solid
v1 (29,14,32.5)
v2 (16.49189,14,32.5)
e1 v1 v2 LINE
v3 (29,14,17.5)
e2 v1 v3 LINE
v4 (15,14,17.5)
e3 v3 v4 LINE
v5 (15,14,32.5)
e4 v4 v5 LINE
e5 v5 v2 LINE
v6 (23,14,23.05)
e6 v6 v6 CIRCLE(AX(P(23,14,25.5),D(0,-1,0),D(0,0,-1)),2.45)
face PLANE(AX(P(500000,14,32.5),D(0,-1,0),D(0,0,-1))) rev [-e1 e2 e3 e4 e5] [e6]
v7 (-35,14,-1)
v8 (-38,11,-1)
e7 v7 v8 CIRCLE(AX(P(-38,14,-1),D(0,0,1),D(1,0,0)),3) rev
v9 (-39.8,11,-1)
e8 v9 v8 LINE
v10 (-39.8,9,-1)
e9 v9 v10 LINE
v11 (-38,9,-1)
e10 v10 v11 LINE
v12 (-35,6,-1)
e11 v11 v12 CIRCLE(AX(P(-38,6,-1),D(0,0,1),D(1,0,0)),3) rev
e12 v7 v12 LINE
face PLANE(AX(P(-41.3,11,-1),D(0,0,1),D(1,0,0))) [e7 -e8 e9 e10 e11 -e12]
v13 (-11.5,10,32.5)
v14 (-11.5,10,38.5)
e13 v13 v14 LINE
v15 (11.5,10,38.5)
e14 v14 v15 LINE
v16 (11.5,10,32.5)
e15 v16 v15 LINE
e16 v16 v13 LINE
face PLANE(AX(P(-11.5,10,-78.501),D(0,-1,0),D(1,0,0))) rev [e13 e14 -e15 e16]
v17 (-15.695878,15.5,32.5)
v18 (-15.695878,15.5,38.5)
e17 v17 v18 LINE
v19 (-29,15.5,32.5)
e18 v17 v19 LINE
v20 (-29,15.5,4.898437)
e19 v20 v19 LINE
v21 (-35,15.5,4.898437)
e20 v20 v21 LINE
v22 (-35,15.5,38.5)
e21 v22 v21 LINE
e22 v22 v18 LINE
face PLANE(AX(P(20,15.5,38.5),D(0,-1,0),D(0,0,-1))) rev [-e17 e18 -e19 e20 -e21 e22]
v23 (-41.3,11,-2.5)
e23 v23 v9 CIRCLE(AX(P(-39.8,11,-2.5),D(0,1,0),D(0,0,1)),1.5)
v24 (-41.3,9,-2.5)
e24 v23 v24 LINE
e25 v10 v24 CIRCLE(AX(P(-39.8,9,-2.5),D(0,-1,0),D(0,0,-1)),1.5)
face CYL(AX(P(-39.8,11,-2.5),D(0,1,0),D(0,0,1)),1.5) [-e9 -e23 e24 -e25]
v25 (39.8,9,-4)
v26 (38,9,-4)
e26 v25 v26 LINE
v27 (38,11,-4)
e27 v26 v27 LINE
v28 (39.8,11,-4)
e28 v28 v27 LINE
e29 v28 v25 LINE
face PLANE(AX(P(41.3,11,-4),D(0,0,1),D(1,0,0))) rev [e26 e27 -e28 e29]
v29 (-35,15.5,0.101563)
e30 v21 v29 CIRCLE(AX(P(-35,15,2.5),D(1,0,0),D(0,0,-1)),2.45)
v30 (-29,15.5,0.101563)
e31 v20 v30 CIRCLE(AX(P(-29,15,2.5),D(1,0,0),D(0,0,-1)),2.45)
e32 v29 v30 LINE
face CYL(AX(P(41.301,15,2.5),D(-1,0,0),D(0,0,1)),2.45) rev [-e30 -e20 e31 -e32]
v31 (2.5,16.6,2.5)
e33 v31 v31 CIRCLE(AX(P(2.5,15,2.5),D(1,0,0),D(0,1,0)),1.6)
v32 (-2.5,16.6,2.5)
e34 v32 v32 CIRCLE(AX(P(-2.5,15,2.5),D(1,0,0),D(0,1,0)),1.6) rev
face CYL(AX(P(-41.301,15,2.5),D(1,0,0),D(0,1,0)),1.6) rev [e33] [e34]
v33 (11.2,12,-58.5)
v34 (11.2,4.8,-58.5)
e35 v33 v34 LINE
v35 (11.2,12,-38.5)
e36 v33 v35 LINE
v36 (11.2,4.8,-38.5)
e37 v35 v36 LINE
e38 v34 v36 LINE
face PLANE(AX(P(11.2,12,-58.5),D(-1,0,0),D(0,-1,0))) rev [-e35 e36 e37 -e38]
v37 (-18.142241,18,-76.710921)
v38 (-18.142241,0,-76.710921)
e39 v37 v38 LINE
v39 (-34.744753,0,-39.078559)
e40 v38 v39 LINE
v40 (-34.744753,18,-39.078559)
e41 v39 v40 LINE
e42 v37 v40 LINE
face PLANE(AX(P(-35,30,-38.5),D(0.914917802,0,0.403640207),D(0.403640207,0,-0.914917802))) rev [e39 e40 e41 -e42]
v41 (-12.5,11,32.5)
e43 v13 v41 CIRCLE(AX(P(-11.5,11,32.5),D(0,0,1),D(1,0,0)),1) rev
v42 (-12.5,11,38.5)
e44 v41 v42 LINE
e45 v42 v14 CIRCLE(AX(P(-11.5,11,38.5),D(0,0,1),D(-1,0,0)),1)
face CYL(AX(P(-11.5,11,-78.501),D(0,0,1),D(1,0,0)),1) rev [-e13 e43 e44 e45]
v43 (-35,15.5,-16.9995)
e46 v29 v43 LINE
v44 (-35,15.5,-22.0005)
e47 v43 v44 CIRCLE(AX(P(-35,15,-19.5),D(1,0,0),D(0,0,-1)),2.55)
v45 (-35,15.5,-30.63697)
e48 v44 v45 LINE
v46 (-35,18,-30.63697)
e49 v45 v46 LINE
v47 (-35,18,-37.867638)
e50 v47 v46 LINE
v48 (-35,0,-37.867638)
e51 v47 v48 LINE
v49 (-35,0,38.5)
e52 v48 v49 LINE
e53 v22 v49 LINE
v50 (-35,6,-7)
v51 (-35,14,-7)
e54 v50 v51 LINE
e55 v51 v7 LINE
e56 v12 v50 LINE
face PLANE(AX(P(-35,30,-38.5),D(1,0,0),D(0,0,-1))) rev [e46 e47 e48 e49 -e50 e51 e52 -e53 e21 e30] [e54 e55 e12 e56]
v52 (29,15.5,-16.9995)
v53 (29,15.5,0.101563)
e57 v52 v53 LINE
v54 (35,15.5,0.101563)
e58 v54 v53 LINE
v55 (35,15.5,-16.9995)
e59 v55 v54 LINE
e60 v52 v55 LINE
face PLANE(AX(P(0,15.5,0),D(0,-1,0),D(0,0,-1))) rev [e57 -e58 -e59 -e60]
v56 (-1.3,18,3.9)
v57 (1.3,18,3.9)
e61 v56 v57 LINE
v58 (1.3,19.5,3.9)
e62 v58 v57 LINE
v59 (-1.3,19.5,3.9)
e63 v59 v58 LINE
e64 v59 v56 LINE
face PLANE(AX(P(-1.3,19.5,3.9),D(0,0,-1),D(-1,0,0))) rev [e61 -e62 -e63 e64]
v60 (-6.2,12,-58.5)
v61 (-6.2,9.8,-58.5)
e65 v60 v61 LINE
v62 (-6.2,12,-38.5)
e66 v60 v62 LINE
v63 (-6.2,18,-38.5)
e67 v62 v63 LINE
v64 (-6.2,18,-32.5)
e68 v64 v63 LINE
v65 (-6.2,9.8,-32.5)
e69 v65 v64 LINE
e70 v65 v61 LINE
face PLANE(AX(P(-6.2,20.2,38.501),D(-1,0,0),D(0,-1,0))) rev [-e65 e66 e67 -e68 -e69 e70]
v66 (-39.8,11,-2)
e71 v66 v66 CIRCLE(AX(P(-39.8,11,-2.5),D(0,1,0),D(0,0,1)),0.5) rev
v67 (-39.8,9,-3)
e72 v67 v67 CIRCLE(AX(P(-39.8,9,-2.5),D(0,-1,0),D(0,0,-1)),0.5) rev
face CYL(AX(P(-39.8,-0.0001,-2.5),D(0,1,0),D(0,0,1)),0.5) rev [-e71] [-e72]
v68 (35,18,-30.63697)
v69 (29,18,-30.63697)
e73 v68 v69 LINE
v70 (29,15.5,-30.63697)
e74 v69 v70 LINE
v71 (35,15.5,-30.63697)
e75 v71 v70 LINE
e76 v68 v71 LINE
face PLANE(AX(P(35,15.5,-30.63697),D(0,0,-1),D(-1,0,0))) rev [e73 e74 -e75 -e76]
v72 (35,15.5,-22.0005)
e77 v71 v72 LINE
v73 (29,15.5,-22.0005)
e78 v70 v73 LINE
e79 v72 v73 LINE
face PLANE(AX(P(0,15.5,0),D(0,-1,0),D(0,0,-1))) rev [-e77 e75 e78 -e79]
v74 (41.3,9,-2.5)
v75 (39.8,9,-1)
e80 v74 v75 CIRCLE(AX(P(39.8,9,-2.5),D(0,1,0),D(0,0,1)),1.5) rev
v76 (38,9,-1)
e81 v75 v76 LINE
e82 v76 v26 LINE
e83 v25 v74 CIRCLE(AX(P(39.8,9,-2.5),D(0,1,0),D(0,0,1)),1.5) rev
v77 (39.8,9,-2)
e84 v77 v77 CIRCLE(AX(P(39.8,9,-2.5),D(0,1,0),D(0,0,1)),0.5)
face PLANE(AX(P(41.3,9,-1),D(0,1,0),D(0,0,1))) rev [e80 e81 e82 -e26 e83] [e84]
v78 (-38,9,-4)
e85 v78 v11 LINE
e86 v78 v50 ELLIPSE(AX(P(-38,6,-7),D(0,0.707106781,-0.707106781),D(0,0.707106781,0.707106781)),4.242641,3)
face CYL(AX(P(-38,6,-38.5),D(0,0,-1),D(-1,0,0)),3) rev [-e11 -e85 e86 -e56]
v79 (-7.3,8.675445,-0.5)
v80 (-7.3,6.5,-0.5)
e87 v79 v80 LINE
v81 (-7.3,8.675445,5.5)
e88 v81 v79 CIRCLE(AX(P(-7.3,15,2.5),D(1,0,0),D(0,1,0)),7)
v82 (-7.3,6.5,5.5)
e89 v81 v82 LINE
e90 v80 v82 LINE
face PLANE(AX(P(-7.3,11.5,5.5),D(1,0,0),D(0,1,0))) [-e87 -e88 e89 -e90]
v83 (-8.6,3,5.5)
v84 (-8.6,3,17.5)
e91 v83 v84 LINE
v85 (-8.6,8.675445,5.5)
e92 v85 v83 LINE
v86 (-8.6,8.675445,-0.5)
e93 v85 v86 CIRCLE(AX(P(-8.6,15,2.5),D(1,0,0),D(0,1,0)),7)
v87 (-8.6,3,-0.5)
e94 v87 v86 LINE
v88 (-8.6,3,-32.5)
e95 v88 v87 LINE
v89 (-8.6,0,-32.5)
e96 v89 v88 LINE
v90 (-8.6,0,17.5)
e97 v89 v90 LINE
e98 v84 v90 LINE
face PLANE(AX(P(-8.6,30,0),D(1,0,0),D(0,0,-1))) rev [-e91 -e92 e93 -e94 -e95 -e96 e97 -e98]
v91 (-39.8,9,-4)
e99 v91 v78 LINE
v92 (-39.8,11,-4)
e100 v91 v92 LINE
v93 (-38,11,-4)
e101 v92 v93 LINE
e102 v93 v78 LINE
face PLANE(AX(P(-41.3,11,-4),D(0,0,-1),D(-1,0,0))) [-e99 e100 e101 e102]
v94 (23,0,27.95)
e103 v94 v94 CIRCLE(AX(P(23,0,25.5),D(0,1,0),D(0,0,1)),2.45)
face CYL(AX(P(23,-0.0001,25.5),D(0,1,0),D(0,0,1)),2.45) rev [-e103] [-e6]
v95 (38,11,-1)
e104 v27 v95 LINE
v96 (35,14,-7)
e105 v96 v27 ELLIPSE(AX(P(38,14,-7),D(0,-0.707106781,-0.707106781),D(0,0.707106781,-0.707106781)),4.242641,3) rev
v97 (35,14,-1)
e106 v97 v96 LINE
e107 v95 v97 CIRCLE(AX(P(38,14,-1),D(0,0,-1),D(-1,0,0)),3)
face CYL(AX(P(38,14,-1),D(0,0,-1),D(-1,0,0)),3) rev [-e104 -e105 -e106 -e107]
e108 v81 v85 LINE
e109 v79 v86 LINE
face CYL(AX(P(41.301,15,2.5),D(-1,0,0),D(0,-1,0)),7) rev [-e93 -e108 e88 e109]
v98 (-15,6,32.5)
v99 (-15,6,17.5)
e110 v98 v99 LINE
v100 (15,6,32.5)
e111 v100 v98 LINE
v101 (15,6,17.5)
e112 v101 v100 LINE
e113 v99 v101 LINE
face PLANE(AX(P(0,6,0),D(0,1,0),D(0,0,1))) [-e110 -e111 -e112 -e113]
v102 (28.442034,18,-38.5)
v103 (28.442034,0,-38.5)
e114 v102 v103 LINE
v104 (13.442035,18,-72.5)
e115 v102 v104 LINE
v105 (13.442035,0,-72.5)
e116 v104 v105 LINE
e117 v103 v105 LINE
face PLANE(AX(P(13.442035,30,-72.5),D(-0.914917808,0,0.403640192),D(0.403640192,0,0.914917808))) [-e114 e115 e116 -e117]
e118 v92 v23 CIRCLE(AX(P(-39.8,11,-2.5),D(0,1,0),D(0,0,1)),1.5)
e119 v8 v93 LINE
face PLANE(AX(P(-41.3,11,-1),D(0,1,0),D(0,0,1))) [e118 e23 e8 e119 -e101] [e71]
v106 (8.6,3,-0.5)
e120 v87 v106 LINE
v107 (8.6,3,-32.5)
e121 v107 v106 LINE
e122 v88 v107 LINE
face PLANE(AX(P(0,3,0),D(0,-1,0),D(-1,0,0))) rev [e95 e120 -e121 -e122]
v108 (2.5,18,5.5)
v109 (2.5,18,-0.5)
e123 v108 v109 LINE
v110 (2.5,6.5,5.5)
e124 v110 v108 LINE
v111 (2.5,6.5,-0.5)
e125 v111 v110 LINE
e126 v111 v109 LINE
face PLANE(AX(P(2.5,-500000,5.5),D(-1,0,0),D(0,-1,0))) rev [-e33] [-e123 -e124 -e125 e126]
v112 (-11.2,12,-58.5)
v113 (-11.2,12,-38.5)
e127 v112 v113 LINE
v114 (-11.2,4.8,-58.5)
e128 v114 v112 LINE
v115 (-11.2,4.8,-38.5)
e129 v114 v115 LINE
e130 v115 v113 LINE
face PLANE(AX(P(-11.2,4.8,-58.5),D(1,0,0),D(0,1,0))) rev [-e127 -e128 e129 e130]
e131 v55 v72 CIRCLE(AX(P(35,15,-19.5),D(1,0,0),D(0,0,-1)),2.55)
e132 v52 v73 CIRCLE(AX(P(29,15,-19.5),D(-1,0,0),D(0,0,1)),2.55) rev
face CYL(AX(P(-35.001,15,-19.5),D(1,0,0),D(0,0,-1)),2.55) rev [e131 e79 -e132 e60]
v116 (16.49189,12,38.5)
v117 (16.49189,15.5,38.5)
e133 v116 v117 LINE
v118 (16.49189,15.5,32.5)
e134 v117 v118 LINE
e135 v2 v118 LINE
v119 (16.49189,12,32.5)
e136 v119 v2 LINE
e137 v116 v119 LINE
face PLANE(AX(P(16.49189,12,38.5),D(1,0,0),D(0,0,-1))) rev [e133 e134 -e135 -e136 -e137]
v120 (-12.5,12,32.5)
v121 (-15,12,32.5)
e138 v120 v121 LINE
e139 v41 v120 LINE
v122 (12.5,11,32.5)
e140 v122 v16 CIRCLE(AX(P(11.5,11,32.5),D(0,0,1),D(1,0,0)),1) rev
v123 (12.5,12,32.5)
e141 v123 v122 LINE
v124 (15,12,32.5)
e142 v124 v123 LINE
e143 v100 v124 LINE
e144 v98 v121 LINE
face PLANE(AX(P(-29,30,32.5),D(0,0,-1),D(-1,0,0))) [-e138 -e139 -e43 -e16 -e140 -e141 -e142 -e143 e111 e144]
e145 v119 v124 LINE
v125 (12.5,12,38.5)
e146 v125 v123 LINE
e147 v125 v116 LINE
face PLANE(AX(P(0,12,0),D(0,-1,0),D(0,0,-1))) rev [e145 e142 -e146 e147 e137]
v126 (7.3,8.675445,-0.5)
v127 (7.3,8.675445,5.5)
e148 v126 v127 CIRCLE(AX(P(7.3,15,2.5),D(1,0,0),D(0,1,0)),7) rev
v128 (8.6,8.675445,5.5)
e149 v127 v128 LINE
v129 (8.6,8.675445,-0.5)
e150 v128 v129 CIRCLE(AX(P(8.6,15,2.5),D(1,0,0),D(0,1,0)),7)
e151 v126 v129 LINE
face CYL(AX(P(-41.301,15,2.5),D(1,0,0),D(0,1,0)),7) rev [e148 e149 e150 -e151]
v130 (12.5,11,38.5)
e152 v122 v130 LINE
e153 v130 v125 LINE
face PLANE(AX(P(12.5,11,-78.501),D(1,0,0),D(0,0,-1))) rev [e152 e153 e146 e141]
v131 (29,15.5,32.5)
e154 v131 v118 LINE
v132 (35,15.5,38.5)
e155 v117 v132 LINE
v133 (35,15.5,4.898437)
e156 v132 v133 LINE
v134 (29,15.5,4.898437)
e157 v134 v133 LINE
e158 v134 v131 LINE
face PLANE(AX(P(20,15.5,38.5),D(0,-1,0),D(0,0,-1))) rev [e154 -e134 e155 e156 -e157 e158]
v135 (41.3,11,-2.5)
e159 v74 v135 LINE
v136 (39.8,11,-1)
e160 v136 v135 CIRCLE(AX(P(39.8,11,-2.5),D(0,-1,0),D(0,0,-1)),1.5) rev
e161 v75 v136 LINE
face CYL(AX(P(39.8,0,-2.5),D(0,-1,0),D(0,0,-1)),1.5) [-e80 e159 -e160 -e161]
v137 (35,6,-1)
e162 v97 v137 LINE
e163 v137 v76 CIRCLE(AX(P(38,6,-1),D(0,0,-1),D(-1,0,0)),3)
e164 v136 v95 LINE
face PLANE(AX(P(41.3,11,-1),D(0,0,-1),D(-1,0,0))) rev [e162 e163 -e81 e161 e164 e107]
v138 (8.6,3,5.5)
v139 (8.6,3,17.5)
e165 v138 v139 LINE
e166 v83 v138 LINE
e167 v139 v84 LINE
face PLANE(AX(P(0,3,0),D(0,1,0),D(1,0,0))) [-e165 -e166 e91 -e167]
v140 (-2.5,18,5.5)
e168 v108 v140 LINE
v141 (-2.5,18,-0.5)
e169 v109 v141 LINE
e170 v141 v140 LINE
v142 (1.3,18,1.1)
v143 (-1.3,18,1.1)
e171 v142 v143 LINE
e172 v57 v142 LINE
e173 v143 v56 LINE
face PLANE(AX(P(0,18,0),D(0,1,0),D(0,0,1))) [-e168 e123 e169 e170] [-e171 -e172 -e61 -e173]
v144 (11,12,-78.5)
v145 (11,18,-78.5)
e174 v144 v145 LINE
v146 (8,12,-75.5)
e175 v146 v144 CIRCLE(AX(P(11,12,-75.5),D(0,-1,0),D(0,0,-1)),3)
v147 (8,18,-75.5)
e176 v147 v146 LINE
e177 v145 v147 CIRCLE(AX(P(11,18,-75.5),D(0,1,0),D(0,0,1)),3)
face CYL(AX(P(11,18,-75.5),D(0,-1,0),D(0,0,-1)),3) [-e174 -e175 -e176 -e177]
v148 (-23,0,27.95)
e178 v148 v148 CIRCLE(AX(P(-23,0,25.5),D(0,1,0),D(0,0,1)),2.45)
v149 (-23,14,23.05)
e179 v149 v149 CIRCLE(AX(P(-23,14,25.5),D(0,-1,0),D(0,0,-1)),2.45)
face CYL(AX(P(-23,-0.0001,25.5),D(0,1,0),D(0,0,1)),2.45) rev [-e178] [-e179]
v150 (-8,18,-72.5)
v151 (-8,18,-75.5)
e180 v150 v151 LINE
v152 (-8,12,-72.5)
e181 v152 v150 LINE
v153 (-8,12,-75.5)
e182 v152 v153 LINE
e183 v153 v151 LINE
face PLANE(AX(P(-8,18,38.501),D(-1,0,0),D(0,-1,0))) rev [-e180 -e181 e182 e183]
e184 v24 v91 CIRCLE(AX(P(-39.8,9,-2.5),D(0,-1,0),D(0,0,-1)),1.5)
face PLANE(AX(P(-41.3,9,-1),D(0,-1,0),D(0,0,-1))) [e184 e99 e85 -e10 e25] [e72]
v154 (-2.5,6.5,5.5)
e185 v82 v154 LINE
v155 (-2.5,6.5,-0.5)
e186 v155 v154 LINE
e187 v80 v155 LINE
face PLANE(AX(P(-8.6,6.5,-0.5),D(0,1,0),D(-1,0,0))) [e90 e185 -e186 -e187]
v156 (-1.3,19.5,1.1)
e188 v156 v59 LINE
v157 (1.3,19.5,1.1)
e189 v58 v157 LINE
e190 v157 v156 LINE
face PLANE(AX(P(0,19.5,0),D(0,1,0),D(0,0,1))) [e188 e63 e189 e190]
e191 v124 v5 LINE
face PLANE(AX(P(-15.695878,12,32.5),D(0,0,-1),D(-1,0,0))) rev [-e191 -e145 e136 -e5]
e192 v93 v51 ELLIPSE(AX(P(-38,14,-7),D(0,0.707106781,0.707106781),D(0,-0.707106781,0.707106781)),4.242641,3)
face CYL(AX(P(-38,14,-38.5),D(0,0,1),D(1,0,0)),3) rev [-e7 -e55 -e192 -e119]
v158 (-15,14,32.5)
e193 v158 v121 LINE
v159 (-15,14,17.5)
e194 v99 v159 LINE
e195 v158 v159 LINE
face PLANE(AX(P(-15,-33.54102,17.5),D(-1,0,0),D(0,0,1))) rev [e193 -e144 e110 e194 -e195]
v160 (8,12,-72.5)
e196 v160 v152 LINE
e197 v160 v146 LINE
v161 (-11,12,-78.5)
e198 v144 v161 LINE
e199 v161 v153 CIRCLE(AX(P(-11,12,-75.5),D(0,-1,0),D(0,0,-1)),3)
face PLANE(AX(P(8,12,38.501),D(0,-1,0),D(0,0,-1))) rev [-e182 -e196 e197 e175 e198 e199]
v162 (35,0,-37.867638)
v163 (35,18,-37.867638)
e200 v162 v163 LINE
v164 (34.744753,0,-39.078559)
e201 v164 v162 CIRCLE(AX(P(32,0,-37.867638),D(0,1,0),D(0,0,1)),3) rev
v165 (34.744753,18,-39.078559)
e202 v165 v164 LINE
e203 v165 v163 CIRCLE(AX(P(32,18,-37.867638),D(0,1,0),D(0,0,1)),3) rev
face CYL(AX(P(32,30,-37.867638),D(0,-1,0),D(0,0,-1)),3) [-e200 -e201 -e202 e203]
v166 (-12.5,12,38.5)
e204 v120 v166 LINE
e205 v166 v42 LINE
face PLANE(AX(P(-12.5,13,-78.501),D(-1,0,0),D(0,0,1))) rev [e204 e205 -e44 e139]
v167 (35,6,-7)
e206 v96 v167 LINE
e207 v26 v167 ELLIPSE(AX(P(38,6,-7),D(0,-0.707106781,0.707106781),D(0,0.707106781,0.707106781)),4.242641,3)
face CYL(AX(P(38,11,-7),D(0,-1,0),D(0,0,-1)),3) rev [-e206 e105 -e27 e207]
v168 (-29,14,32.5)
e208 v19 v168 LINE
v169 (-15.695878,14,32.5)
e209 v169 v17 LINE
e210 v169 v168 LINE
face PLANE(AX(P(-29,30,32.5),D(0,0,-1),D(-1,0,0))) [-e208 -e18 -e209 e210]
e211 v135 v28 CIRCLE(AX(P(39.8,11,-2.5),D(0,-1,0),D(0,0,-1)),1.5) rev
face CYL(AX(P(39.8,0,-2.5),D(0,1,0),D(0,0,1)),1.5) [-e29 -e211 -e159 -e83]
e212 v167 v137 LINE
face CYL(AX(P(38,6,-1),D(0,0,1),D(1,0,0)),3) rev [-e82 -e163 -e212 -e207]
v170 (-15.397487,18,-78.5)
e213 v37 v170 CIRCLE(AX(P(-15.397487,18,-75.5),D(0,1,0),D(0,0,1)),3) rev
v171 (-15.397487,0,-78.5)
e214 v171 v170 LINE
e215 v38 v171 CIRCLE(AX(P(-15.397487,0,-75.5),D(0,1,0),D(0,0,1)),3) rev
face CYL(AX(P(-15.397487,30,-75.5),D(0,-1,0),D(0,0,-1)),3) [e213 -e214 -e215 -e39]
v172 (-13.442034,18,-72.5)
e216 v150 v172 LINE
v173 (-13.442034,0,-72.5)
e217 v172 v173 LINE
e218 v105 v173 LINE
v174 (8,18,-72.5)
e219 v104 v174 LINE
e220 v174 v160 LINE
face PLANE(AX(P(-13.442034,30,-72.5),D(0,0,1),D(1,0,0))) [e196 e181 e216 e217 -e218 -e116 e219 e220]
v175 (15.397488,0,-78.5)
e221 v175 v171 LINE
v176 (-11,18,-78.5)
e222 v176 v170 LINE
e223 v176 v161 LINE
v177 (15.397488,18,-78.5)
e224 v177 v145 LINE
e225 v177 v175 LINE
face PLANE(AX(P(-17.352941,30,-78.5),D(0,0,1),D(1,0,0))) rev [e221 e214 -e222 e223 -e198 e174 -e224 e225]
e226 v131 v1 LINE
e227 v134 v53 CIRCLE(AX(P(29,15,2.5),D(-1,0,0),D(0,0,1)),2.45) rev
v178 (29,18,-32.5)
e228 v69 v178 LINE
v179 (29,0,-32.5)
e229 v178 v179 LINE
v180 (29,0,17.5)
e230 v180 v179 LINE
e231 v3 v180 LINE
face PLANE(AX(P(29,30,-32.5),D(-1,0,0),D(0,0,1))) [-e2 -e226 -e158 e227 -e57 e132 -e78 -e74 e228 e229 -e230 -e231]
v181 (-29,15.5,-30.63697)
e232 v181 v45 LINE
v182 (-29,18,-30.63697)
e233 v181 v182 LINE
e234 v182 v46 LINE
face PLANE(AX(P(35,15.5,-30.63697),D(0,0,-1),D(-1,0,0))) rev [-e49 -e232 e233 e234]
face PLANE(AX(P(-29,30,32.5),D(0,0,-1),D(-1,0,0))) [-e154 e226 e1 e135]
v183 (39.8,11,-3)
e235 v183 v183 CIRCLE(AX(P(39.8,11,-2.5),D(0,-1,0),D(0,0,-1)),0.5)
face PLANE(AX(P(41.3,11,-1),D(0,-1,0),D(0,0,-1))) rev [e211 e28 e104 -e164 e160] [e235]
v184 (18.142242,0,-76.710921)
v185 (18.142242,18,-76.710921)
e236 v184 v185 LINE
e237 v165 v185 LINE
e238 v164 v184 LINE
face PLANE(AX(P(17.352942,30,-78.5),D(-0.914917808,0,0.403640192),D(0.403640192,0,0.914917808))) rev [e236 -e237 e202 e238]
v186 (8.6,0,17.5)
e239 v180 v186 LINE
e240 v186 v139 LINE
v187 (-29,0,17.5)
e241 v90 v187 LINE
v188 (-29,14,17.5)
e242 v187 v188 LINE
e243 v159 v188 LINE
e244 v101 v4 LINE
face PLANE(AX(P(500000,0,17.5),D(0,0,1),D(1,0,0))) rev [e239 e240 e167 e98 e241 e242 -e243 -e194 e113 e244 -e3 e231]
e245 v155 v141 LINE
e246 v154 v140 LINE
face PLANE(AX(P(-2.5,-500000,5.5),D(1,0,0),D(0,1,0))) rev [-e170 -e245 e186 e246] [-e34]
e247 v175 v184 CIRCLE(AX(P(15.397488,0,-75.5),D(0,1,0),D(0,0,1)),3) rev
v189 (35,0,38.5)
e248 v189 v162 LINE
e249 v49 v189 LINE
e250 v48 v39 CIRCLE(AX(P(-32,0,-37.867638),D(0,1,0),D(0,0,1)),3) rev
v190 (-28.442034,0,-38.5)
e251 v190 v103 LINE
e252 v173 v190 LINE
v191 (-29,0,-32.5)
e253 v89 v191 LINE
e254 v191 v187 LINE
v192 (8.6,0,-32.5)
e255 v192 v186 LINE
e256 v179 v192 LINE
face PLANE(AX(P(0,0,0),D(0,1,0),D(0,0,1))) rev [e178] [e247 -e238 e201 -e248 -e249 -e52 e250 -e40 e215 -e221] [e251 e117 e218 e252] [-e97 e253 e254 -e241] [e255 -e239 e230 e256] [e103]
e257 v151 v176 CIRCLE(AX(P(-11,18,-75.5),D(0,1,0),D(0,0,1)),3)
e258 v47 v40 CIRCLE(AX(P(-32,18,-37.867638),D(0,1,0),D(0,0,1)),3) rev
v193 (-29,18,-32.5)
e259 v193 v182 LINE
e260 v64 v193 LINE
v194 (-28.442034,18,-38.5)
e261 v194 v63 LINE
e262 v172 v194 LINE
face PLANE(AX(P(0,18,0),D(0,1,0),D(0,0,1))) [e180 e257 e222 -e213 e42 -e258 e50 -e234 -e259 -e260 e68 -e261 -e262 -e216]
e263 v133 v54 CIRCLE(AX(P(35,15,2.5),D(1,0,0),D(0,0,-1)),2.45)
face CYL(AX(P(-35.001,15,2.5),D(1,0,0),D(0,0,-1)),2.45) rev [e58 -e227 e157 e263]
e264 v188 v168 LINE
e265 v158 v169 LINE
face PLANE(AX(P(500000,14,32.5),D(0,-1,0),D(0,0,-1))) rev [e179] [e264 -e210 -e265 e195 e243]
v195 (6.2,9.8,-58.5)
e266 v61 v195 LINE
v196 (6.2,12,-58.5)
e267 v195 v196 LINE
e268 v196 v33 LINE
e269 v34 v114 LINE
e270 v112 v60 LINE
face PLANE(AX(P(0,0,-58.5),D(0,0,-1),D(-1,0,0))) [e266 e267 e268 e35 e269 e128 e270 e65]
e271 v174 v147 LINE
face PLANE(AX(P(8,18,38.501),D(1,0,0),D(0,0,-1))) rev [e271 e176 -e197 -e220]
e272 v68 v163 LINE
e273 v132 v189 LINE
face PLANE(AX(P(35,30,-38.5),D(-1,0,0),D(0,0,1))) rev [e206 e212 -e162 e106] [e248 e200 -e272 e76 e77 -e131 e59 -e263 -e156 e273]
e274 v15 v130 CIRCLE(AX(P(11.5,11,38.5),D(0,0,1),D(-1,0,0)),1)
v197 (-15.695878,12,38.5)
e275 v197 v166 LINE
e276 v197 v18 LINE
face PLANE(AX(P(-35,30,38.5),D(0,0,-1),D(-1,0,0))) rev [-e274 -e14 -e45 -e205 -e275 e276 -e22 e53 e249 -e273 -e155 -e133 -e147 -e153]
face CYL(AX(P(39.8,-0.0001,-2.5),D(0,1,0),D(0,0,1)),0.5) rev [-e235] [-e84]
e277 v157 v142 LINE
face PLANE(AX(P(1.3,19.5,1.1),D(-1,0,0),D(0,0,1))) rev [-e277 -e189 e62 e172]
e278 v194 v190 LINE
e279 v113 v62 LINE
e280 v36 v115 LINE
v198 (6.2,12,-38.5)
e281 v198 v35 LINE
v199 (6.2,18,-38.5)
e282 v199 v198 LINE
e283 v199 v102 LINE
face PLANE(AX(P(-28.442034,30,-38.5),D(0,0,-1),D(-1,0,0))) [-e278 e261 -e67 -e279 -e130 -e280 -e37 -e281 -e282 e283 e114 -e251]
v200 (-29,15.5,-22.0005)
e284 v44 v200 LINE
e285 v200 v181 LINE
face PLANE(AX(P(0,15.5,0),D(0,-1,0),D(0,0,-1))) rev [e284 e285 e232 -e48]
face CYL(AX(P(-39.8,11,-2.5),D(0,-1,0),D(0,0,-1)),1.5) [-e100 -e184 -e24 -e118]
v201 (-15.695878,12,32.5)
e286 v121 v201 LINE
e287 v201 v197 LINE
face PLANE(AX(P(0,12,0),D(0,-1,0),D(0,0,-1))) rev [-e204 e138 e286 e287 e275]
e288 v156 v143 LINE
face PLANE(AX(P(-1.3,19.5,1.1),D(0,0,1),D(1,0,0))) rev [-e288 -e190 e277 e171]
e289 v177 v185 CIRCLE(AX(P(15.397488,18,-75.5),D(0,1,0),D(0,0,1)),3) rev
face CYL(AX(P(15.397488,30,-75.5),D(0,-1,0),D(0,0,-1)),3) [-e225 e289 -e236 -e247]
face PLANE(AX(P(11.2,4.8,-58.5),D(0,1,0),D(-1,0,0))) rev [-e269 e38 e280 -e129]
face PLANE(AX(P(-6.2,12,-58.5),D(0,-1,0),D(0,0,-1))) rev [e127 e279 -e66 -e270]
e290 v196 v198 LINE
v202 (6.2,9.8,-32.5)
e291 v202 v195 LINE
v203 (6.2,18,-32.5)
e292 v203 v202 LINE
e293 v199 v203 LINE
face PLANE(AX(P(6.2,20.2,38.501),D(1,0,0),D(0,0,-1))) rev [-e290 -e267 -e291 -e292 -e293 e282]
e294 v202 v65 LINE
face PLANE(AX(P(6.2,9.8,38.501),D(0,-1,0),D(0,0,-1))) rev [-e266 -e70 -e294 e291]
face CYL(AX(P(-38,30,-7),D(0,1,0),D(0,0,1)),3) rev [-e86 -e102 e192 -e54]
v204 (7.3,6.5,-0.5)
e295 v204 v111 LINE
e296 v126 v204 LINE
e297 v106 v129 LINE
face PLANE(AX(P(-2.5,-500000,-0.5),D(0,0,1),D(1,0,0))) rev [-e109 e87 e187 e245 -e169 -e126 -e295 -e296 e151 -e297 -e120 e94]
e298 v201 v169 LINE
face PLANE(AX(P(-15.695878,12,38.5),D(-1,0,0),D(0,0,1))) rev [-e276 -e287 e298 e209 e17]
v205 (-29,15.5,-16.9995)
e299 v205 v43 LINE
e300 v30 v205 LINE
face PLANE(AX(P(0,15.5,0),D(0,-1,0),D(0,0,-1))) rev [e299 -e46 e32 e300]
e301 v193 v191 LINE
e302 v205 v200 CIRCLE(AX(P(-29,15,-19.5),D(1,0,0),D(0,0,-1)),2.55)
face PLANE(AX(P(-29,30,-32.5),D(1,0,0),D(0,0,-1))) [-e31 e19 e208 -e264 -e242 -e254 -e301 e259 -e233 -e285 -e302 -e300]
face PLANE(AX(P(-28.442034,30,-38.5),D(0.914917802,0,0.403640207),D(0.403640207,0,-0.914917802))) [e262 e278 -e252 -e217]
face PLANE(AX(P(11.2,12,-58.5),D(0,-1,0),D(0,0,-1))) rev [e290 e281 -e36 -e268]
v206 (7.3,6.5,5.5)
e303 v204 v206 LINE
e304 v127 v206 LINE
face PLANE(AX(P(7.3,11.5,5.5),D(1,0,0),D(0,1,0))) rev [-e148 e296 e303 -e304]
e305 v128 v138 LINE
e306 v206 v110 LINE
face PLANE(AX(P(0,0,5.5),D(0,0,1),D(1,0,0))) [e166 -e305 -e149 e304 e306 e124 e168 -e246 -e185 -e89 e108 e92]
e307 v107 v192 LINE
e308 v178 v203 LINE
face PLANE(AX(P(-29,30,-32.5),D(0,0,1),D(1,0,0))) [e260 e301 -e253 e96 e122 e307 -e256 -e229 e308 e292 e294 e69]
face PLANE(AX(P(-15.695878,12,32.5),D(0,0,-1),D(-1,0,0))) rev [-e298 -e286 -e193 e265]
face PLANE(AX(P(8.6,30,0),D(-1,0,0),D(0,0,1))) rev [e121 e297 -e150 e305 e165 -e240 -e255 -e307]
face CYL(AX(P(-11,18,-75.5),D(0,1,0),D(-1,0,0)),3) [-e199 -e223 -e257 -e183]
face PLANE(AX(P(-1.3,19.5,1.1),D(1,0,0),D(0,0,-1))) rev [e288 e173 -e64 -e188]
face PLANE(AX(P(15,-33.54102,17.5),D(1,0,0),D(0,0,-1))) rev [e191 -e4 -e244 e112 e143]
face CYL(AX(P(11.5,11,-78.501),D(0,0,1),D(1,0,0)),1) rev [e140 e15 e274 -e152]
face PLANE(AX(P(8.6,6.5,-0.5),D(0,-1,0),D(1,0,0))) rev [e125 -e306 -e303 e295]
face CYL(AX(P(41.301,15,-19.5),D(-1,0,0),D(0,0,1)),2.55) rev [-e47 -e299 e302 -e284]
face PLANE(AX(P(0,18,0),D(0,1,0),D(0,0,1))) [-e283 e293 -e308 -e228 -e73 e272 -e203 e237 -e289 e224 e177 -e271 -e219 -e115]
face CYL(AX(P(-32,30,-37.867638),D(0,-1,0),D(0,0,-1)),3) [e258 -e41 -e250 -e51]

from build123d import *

# Parameters (mm, degrees)
SKETCH1_W               = 58
SKETCH1_H               = 65
BOSS_EXTRUDE1_DEPTH     = 30
BOSS_EXTRUDE3_REACH     = 92.09
SKETCH10_W              = 5
SKETCH10_H              = 6
CUT_EXTRUDE1_REACH      = 111.372
SKETCH2_R               = 2.45
SKETCH2_R_2             = 2.55
CUT_EXTRUDE2_REACH      = 91.744
SKETCH3_W               = 12.4
SKETCH3_H               = 10.4
SKETCH11_W              = 3
SKETCH11_H              = 2
BOSS_EXTRUDE4_DEPTH     = 6.3
FILLET3_R               = 1.5
SKETCH12_R              = 0.5
CUT_EXTRUDE3_DEPTH      = 92.15338732
FILLET3_OF_MIRROR1_R    = 1.5
BOSS_EXTRUDE5_REACH     = 111.564
SKETCH13_W              = 15
SKETCH13_H              = 6
BOSS_EXTRUDE6_REACH     = 111.564
SKETCH17_W              = 15
SKETCH17_H              = 14
SKETCH14_R              = 2.45
CUT_EXTRUDE4_DEPTH      = 94.637279017
SKETCH16_W              = 16
SKETCH16_H              = 7
CUT_EXTRUDE7_DEPTH      = 15
CUT_EXTRUDE8_REACH      = 129.651
CUT_EXTRUDE9_START      = -6
SKETCH19_W              = 30
SKETCH19_H              = 15
CUT_EXTRUDE9_DEPTH      = 18
CUT_EXTRUDE18_REACH     = 129.651
SKETCH35_W              = 16
SKETCH35_H              = 6
FILLET5_R               = 3
BOSS_EXTRUDE7_START     = 20.2
BOSS_EXTRUDE7_DEPTH     = 9.8
CUT_EXTRUDE12_REACH     = 109.009
CUT_EXTRUDE12_START     = 16.5
SKETCH23_W              = 12.3
SKETCH23_H              = 6
BOSS_EXTRUDE8_DEPTH     = 20
CUT_EXTRUDE15_REACH     = 95.168
SKETCH28_R              = 0.8
FILLET4_R               = 3
CUT_EXTRUDE16_REACH     = 96.767
SKETCH29_R              = 1.6
SKETCH30_W              = 6
SKETCH30_H              = 3.5
BOSS_EXTRUDE9_DEPTH     = 6.1
SKETCH31_W              = 1.3
SKETCH31_H              = 6
BOSS_EXTRUDE10_DEPTH    = 5
CUT_EXTRUDE17_REACH     = 99.736
MIRROR5_COPY_1_SKETCH_W = 6
MIRROR5_COPY_1_SKETCH_H = 3.5
MIRROR5_COPY_1_DEPTH    = 6.1
MIRROR5_COPY_2_SKETCH_W = 1.3
MIRROR5_COPY_2_SKETCH_H = 6
MIRROR5_COPY_2_DEPTH    = 5
MIRROR5_COPY_3_REACH    = 99.736
SKETCH36_W              = 164.658600107
SKETCH36_H              = 149.862089959
CUT_EXTRUDE19_DEPTH     = 12
SKETCH37_W              = 5
SKETCH37_H              = 6
CUT_EXTRUDE20_DEPTH     = 2.5
SKETCH38_W              = 32.18776844
SKETCH38_H              = 6
CUT_EXTRUDE21_DEPTH     = 3.5
SKETCH39_W              = 2.6
SKETCH39_H              = 2.8
BOSS_EXTRUDE11_DEPTH    = 1.5


with BuildPart() as part:
    # Sketch1 → Boss-Extrude1 (new body)
    with BuildSketch(Plane(origin=(0, 0, 0), x_dir=(1, 0, 0), z_dir=(0, 1, 0))):
        Polygon((-35, 38.5), (-17.352941176, 78.5), (17.352941947, 78.5), (35, 38.5), (35, -38.5), (-35, -38.5), align=None)
        Rectangle(SKETCH1_W, SKETCH1_H, mode=Mode.SUBTRACT)
        Polygon((-28.44203382, 38.5), (28.442033867, 38.5), (13.442034522, 72.5), (-13.44203382, 72.5), align=None, mode=Mode.SUBTRACT)
    extrude(amount=BOSS_EXTRUDE1_DEPTH)

    # Sketch7 → Loft3 section 0
    with BuildSketch(Plane.XY.offset(-32.5)):
        with BuildLine():
            Line((-8.6, 30), (8.6, 30))
            Line((8.6, 30), (8.6, 27))
            Line((8.6, 27), (-8.6, 27))
            Line((-8.6, 27), (-8.6, 30))
        make_face()
    # Sketch8 → Loft3 section 1
    with BuildSketch(Plane.XY.offset(5.5)):
        with BuildLine():
            Line((-8.6, 30), (8.6, 30))
            Line((8.6, 30), (8.6, 27))
            Line((8.6, 27), (-8.6, 27))
            Line((-8.6, 27), (-8.6, 30))
        make_face()
    loft3 = loft()

    # Mirror3: Loft3 across plane
    add(loft3.mirror(Plane(origin=(0, 15, 0), x_dir=(0, 0, 1), z_dir=(0, -1, 0))))

    # Sketch10 → Boss-Extrude3 (add, up to next)
    with BuildSketch(Plane.XZ.offset(-27), mode=Mode.PRIVATE) as boss_extrude3_sk1:
        with Locations((0, 2.5)):
            Rectangle(SKETCH10_W, SKETCH10_H)
    boss_extrude3_tool1 = extrude(boss_extrude3_sk1.sketch, amount=BOSS_EXTRUDE3_REACH, mode=Mode.PRIVATE) - part.part
    add(boss_extrude3_tool1.solids().sort_by_distance((0, 27, 2.5))[0])

    # Sketch2 → Cut-Extrude1 (cut, up to next)
    with BuildSketch(Plane(origin=(35, 0, 0), x_dir=(0, 0, -1), z_dir=(1, 0, 0)), mode=Mode.PRIVATE) as cut_extrude1_sk1:
        with Locations((-2.5, 15)):
            Circle(SKETCH2_R)
    cut_extrude1_tool1 = extrude(cut_extrude1_sk1.sketch, amount=-CUT_EXTRUDE1_REACH, mode=Mode.PRIVATE) & part.part
    # Sketch2 → Cut-Extrude1 (cut, up to next)
    with BuildSketch(Plane(origin=(35, 0, 0), x_dir=(0, 0, -1), z_dir=(1, 0, 0)), mode=Mode.PRIVATE) as cut_extrude1_sk2:
        with Locations((19.5, 15)):
            Circle(SKETCH2_R_2)
    cut_extrude1_tool2 = extrude(cut_extrude1_sk2.sketch, amount=-CUT_EXTRUDE1_REACH, mode=Mode.PRIVATE) & part.part
    cut_extrude1_1 = cut_extrude1_tool1.solids().sort_by_distance((35, 15, 2.5))[0]
    add(cut_extrude1_1, mode=Mode.SUBTRACT)
    cut_extrude1_2 = cut_extrude1_tool2.solids().sort_by_distance((35, 15, -19.5))[0]
    add(cut_extrude1_2, mode=Mode.SUBTRACT)
    cut_extrude1 = cut_extrude1_1 + cut_extrude1_2  # Cut-Extrude1 as one shape, for the pattern or mirror that repeats it

    # Sketch3 → Cut-Extrude2 (cut, up to next)
    with BuildSketch(Plane(origin=(0, 0, -38.5), x_dir=(-1, 0, 0), z_dir=(0, 0, -1)), mode=Mode.PRIVATE) as cut_extrude2_sk1:
        with Locations((0, 15)):
            Rectangle(SKETCH3_W, SKETCH3_H)
    cut_extrude2_tool1 = extrude(cut_extrude2_sk1.sketch, amount=-CUT_EXTRUDE2_REACH, mode=Mode.PRIVATE) & part.part
    add(cut_extrude2_tool1.solids().sort_by_distance((0, 15, -38.5))[0], mode=Mode.SUBTRACT)

    # Sketch11 → Boss-Extrude4 (add)
    with BuildSketch(Plane(origin=(35, 0, 0), x_dir=(0, 0, -1), z_dir=(1, 0, 0))):
        with Locations((2.5, 20)):
            Rectangle(SKETCH11_W, SKETCH11_H)
        with Locations((2.5, 10)):
            Rectangle(SKETCH11_W, SKETCH11_H)
    boss_extrude4 = extrude(amount=BOSS_EXTRUDE4_DEPTH)

    # Fillet3
    fillet3_edges = [part.edges().sort_by_distance(p)[0] for p in [
        (41.3, 10, -1),
        (41.3, 10, -4),
        (41.3, 20, -1),
        (41.3, 20, -4),
    ]]
    fillet(fillet3_edges, radius=FILLET3_R - 0.0001)  # a hair under: the kernel refuses the full size

    # Sketch12 → Cut-Extrude3 (cut, through all)
    with BuildSketch(Plane(origin=(0, 21, 0), x_dir=(1, 0, 0), z_dir=(0, 1, 0))):
        with Locations(Location((39.8, 2.5, 0), (0, 0, 270))):
            Circle(SKETCH12_R)
    cut_extrude3 = extrude(amount=-CUT_EXTRUDE3_DEPTH, mode=Mode.SUBTRACT)

    # Mirror1: Cut-Extrude1, Boss-Extrude4, Cut-Extrude3 across plane
    add(cut_extrude1.mirror(Plane(origin=(0, 0, 0), x_dir=(0, 0, 1), z_dir=(1, 0, 0))), mode=Mode.SUBTRACT)
    add(boss_extrude4.mirror(Plane(origin=(0, 0, 0), x_dir=(0, 0, 1), z_dir=(1, 0, 0))))
    add(cut_extrude3.mirror(Plane(origin=(0, 0, 0), x_dir=(0, 0, 1), z_dir=(1, 0, 0))), mode=Mode.SUBTRACT)

    # Fillet3 of Mirror1
    fillet3_of_mirror1_edges = [part.edges().sort_by_distance(p)[0] for p in [
        (-41.3, 10, -1),
        (-41.3, 10, -4),
        (-41.3, 20, -1),
        (-41.3, 20, -4),
    ]]
    fillet(fillet3_of_mirror1_edges, radius=FILLET3_OF_MIRROR1_R - 0.0001)  # a hair under: the kernel refuses the full size

    # Sketch13 → Boss-Extrude5 (add, up to next)
    with BuildSketch(Plane(origin=(-29, 0, 0), x_dir=(0, 0, -1), z_dir=(1, 0, 0)), mode=Mode.PRIVATE) as boss_extrude5_sk1:
        with Locations((-25, 27)):
            Rectangle(SKETCH13_W, SKETCH13_H)
    boss_extrude5_tool1 = extrude(boss_extrude5_sk1.sketch, amount=BOSS_EXTRUDE5_REACH, mode=Mode.PRIVATE) - part.part
    add(boss_extrude5_tool1.solids().sort_by_distance((-29, 27, 25))[0])

    # Sketch17 → Boss-Extrude6 (add, up to next)
    with BuildSketch(Plane(origin=(-29, 0, 0), x_dir=(0, 0, -1), z_dir=(1, 0, 0)), mode=Mode.PRIVATE) as boss_extrude6_sk1:
        with Locations((-25, 7)):
            Rectangle(SKETCH17_W, SKETCH17_H)
    boss_extrude6_tool1 = extrude(boss_extrude6_sk1.sketch, amount=BOSS_EXTRUDE6_REACH, mode=Mode.PRIVATE) - part.part
    add(boss_extrude6_tool1.solids().sort_by_distance((-29, 7, 25))[0])

    # Sketch14 → Cut-Extrude4 (cut, through all)
    with BuildSketch(Plane(origin=(0, 30, 0), x_dir=(1, 0, 0), z_dir=(0, 1, 0))):
        with Locations(Location((-23, -25.5, 0), (0, 0, 270))):
            Circle(SKETCH14_R)
        with Locations(Location((23, -25.5, 0), (0, 0, 270))):
            Circle(SKETCH14_R)
    extrude(amount=-CUT_EXTRUDE4_DEPTH, mode=Mode.SUBTRACT)

    # Sketch16 → Cut-Extrude7 (cut)
    with BuildSketch(Plane(origin=(35, 0, 0), x_dir=(0, 0, -1), z_dir=(1, 0, 0))):
        with Locations((-30.5, 19)):
            Rectangle(SKETCH16_W, SKETCH16_H)
    cut_extrude7 = extrude(amount=-CUT_EXTRUDE7_DEPTH, mode=Mode.SUBTRACT)

    # Mirror2: Cut-Extrude7 across plane
    add(cut_extrude7.mirror(Plane(origin=(0, 0, 0), x_dir=(0, 0, 1), z_dir=(1, 0, 0))), mode=Mode.SUBTRACT)

    # Sketch18 → Cut-Extrude8 (cut, up to next)
    with BuildSketch(Plane.XY.offset(38.5), mode=Mode.PRIVATE) as cut_extrude8_sk1:
        with BuildLine():
            Line((-11.5, 14), (11.5, 14))
            ThreePointArc((11.5, 14), (12.207106781, 13.707106781), (12.5, 13))
            Line((12.5, 13), (12.5, 11))
            ThreePointArc((12.5, 11), (12.207106781, 10.292893219), (11.5, 10))
            Line((11.5, 10), (-11.5, 10))
            ThreePointArc((-11.5, 10), (-12.207106781, 10.292893219), (-12.5, 11))
            Line((-12.5, 11), (-12.5, 13))
            ThreePointArc((-12.5, 13), (-12.207106781, 13.707106781), (-11.5, 14))
        make_face()
    cut_extrude8_tool1 = extrude(cut_extrude8_sk1.sketch, amount=-CUT_EXTRUDE8_REACH, mode=Mode.PRIVATE) & part.part
    add(cut_extrude8_tool1.solids().sort_by_distance((0, 12, 38.5))[0], mode=Mode.SUBTRACT)

    # Sketch19 → Cut-Extrude9 (cut)
    with BuildSketch(Plane(origin=(0, 30, 0), x_dir=(1, 0, 0), z_dir=(0, 1, 0)).offset(CUT_EXTRUDE9_START)):
        with Locations((0, -25)):
            Rectangle(SKETCH19_W, SKETCH19_H)
    extrude(amount=-CUT_EXTRUDE9_DEPTH, mode=Mode.SUBTRACT)

    # Sketch35 → Cut-Extrude18 (cut, up to next)
    with BuildSketch(Plane(origin=(0, 0, -78.5), x_dir=(-1, 0, 0), z_dir=(0, 0, -1)), mode=Mode.PRIVATE) as cut_extrude18_sk1:
        with Locations((0, 15)):
            Rectangle(SKETCH35_W, SKETCH35_H)
    cut_extrude18_tool1 = extrude(cut_extrude18_sk1.sketch, amount=-CUT_EXTRUDE18_REACH, mode=Mode.PRIVATE) & part.part
    add(cut_extrude18_tool1.solids().sort_by_distance((0, 15, -78.5))[0], mode=Mode.SUBTRACT)

    # Fillet5
    fillet5_edges = [part.edges().sort_by_distance(p)[0] for p in [
        (-35, 15, -38.5),
        (-17.352941176, 15, -78.5),
        (17.352941947, 15, -78.5),
        (35, 15, -38.5),
        (-8, 15, -78.5),
        (8, 15, -78.5),
    ]]
    fillet(fillet5_edges, radius=FILLET5_R)

    # Sketch24 → Boss-Extrude7 (add)
    with BuildSketch(Plane(origin=(0, 0, 0), x_dir=(1, 0, 0), z_dir=(0, 1, 0)).offset(BOSS_EXTRUDE7_START)):
        Polygon((9.15, 52.5), (9.15, 72.5), (6.15, 72.5), (6.15, 49.5), (-6.15, 49.5), (-6.15, 72.5), (-9.15, 72.5), (-9.15, 49.5), (-23.589092644, 49.5), (-26.23615161, 43.5), (26.23615161, 43.5), (22.346632225, 52.316244325), align=None)
    extrude(amount=BOSS_EXTRUDE7_DEPTH)

    # Sketch23 → Cut-Extrude12 (cut, up to next)
    with BuildSketch(Plane(origin=(0, 12, 0), x_dir=(1, 0, 0), z_dir=(0, 1, 0)).offset(CUT_EXTRUDE12_START), mode=Mode.PRIVATE) as cut_extrude12_sk1:
        with Locations((0, 75.5)):
            Rectangle(SKETCH23_W, SKETCH23_H)
    cut_extrude12_tool1 = extrude(cut_extrude12_sk1.sketch, amount=CUT_EXTRUDE12_REACH, mode=Mode.PRIVATE) & part.part
    # Sketch23 → Cut-Extrude12 (cut, up to next)
    with BuildSketch(Plane(origin=(0, 12, 0), x_dir=(1, 0, 0), z_dir=(0, 1, 0)).offset(CUT_EXTRUDE12_START), mode=Mode.PRIVATE) as cut_extrude12_sk2:
        with Locations((0, 46.5)):
            Rectangle(SKETCH23_W, SKETCH23_H)
    cut_extrude12_tool2 = extrude(cut_extrude12_sk2.sketch, amount=CUT_EXTRUDE12_REACH, mode=Mode.PRIVATE) & part.part
    add(cut_extrude12_tool1.solids().sort_by_distance((0, 28.5, -75.5))[0], mode=Mode.SUBTRACT)
    add(cut_extrude12_tool2.solids().sort_by_distance((0, 28.5, -46.5))[0], mode=Mode.SUBTRACT)

    # Sketch26 → Boss-Extrude8 (add)
    with BuildSketch(Plane(origin=(0, 0, -38.5), x_dir=(-1, 0, 0), z_dir=(0, 0, -1))):
        Polygon((-6.2, 9.8), (6.2, 9.8), (6.2, 12), (11.2, 12), (11.2, 4.8), (-11.2, 4.8), (-11.2, 12), (-6.2, 12), align=None)
    extrude(amount=BOSS_EXTRUDE8_DEPTH)

    # Sketch28 → Cut-Extrude15 (cut, up to next)
    with BuildSketch(Plane(origin=(0, 28.5, 0), x_dir=(-1, 0, 0), z_dir=(0, 1, 0)), mode=Mode.PRIVATE) as cut_extrude15_sk1:
        with Locations(Location((0, -46.5, 0), (0, 0, 90))):
            Circle(SKETCH28_R)
    cut_extrude15_tool1 = extrude(cut_extrude15_sk1.sketch, amount=-CUT_EXTRUDE15_REACH, mode=Mode.PRIVATE) & part.part
    # Sketch28 → Cut-Extrude15 (cut, up to next)
    with BuildSketch(Plane(origin=(0, 28.5, 0), x_dir=(-1, 0, 0), z_dir=(0, 1, 0)), mode=Mode.PRIVATE) as cut_extrude15_sk2:
        with Locations(Location((0, -75.5, 0), (0, 0, 90))):
            Circle(SKETCH28_R)
    cut_extrude15_tool2 = extrude(cut_extrude15_sk2.sketch, amount=-CUT_EXTRUDE15_REACH, mode=Mode.PRIVATE) & part.part
    add(cut_extrude15_tool1.solids().sort_by_distance((0, 28.5, -46.5))[0], mode=Mode.SUBTRACT)
    add(cut_extrude15_tool2.solids().sort_by_distance((0, 28.5, -75.5))[0], mode=Mode.SUBTRACT)

    # Fillet4
    fillet4_edges = [part.edges().sort_by_distance(p)[0] for p in [
        (35, 19, -2.5),
        (35, 20, -4),
        (35, 21, -2.5),
        (35, 11, -2.5),
        (35, 9, -2.5),
        (35, 10, -4),
        (-35, 19, -2.5),
        (-35, 20, -4),
        (-35, 21, -2.5),
        (-35, 11, -2.5),
        (-35, 9, -2.5),
        (-35, 10, -4),
    ]]
    fillet(fillet4_edges, radius=FILLET4_R)

    # Sketch29 → Cut-Extrude16 (cut, up to next)
    with BuildSketch(Plane(origin=(2.5, 0, 0), x_dir=(0, 0, -1), z_dir=(1, 0, 0)), mode=Mode.PRIVATE) as cut_extrude16_sk1:
        with Locations(Location((-2.5, 15, 0), (0, 0, 90))):
            Circle(SKETCH29_R)
    cut_extrude16_tool1 = extrude(cut_extrude16_sk1.sketch, amount=-CUT_EXTRUDE16_REACH, mode=Mode.PRIVATE) & part.part
    add(cut_extrude16_tool1.solids().sort_by_distance((2.5, 15, 2.5))[0], mode=Mode.SUBTRACT)

    # Sketch30 → Boss-Extrude9 (add)
    with BuildSketch(Plane.ZY.offset(2.5)):
        with Locations((2.5, 25.25)):
            Rectangle(SKETCH30_W, SKETCH30_H)
    boss_extrude9 = extrude(amount=BOSS_EXTRUDE9_DEPTH)

    # Sketch31 → Boss-Extrude10 (add)
    with BuildSketch(Plane.XZ.offset(-23.5)):
        with Locations((-7.95, 2.5)):
            Rectangle(SKETCH31_W, SKETCH31_H)
    boss_extrude10 = extrude(amount=BOSS_EXTRUDE10_DEPTH)

    # Sketch32 → Cut-Extrude17 (cut, up to next)
    with BuildSketch(Plane.ZY.offset(8.6), mode=Mode.PRIVATE) as cut_extrude17_sk1:
        with BuildLine():
            Line((-0.5, 18.5), (-0.5, 21.32455532))
            ThreePointArc((-0.5, 21.32455532), (2.5, 22), (5.5, 21.32455532))
            Line((5.5, 21.32455532), (5.5, 18.5))
            Line((5.5, 18.5), (-0.5, 18.5))
        make_face()
    cut_extrude17_tool1 = extrude(cut_extrude17_sk1.sketch, amount=-CUT_EXTRUDE17_REACH, mode=Mode.PRIVATE) & part.part
    cut_extrude17 = cut_extrude17_tool1.solids().sort_by_distance((-8.6, 20.145783, 2.5))[0]
    add(cut_extrude17, mode=Mode.SUBTRACT)

    # Mirror4: Boss-Extrude9, Boss-Extrude10, Cut-Extrude17 across plane
    add(boss_extrude9.mirror(Plane(origin=(0, 15, 0), x_dir=(0, 0, 1), z_dir=(0, -1, 0))))
    add(boss_extrude10.mirror(Plane(origin=(0, 15, 0), x_dir=(0, 0, 1), z_dir=(0, -1, 0))))
    add(cut_extrude17.mirror(Plane(origin=(0, 15, 0), x_dir=(0, 0, 1), z_dir=(0, -1, 0))), mode=Mode.SUBTRACT)

    # Mirror5: Boss-Extrude9, Boss-Extrude10, Cut-Extrude17 across plane
    add(boss_extrude9.mirror(Plane(origin=(0, 0, 0), x_dir=(0, 0, 1), z_dir=(1, 0, 0))))
    add(boss_extrude10.mirror(Plane(origin=(0, 0, 0), x_dir=(0, 0, 1), z_dir=(1, 0, 0))))
    add(cut_extrude17.mirror(Plane(origin=(0, 0, 0), x_dir=(0, 0, 1), z_dir=(1, 0, 0))), mode=Mode.SUBTRACT)

    # Mirror5 copy 1 sketch → Mirror5 copy 1 (add)
    with BuildSketch(Plane(origin=(2.5, 30, 0), x_dir=(0, 0, 1), z_dir=(1, 0, 0))):
        with Locations((2.5, 25.25)):
            Rectangle(MIRROR5_COPY_1_SKETCH_W, MIRROR5_COPY_1_SKETCH_H)
    extrude(amount=MIRROR5_COPY_1_DEPTH)

    # Mirror5 copy 2 sketch → Mirror5 copy 2 (add)
    with BuildSketch(Plane(origin=(0, 6.5, 0), x_dir=(-1, 0, 0), z_dir=(0, 1, 0))):
        with Locations((-7.95, 2.5)):
            Rectangle(MIRROR5_COPY_2_SKETCH_W, MIRROR5_COPY_2_SKETCH_H)
    extrude(amount=MIRROR5_COPY_2_DEPTH)

    # Mirror5 copy 3 sketch → Mirror5 copy 3 (cut, up to next)
    with BuildSketch(Plane(origin=(8.6, 30, 0), x_dir=(0, 0, 1), z_dir=(1, 0, 0)), mode=Mode.PRIVATE) as mirror5_copy_3_sk1:
        with BuildLine():
            Line((-0.5, 18.5), (-0.5, 21.32455532))
            ThreePointArc((-0.5, 21.32455532), (2.5, 22), (5.5, 21.32455532))
            Line((5.5, 21.32455532), (5.5, 18.5))
            Line((5.5, 18.5), (-0.5, 18.5))
        make_face()
    mirror5_copy_3_tool1 = extrude(mirror5_copy_3_sk1.sketch, amount=-MIRROR5_COPY_3_REACH, mode=Mode.PRIVATE) & part.part
    add(mirror5_copy_3_tool1.solids().sort_by_distance((8.6, 9.854217, 2.5))[0], mode=Mode.SUBTRACT)

    # Sketch33 → Loft4 section 0
    with BuildSketch(Plane.XY.offset(5.5)):
        with BuildLine():
            Line((-8.6, 30), (8.6, 30))
            Line((8.6, 30), (8.6, 27))
            Line((8.6, 27), (-8.6, 27))
            Line((-8.6, 27), (-8.6, 30))
        make_face()
    # Sketch34 → Loft4 section 1
    with BuildSketch(Plane(origin=(0, 0, 17.5), x_dir=(-1, 0, 0), z_dir=(0, 0, -1))):
        with BuildLine():
            Line((-8.6, 30), (8.6, 30))
            Line((8.6, 30), (8.6, 27))
            Line((8.6, 27), (-8.6, 27))
            Line((-8.6, 27), (-8.6, 30))
        make_face()
    loft4 = loft()

    # Mirror6: Loft4 across plane
    add(loft4.mirror(Plane(origin=(0, 15, 0), x_dir=(0, 0, 1), z_dir=(0, -1, 0))))

    # Sketch36 → Cut-Extrude19 (cut)
    with BuildSketch(Plane(origin=(0, 30, 0), x_dir=(1, 0, 0), z_dir=(0, 1, 0))):
        with Locations((2.558914309, 20.716820694)):
            Rectangle(SKETCH36_W, SKETCH36_H)
    extrude(amount=-CUT_EXTRUDE19_DEPTH, mode=Mode.SUBTRACT)

    # Sketch37 → Cut-Extrude20 (cut)
    with BuildSketch(Plane(origin=(0, 18, 0), x_dir=(1, 0, 0), z_dir=(0, 1, 0))):
        Polygon((35, 30.636970377), (-54.070998832, 30.636970377), (-54.070998832, -45.113589703), (35, -45.113589703), (52.4824214, -45.113589703), (52.4824214, 30.636970377), align=None)
        with Locations((0, -2.5)):
            Rectangle(SKETCH37_W, SKETCH37_H, mode=Mode.SUBTRACT)
    extrude(amount=-CUT_EXTRUDE20_DEPTH, mode=Mode.SUBTRACT)

    # Sketch38 → Cut-Extrude21 (cut)
    with BuildSketch(Plane(origin=(0, 15.5, 0), x_dir=(1, 0, 0), z_dir=(0, 1, 0))):
        with Locations((0.398006196, -35.5)):
            Rectangle(SKETCH38_W, SKETCH38_H)
    extrude(amount=-CUT_EXTRUDE21_DEPTH, mode=Mode.SUBTRACT)

    # Sketch39 → Boss-Extrude11 (add)
    with BuildSketch(Plane(origin=(0, 18, 0), x_dir=(1, 0, 0), z_dir=(0, 1, 0))):
        with Locations((0, -2.5)):
            Rectangle(SKETCH39_W, SKETCH39_H)
    extrude(amount=BOSS_EXTRUDE11_DEPTH)


solid = part.part
